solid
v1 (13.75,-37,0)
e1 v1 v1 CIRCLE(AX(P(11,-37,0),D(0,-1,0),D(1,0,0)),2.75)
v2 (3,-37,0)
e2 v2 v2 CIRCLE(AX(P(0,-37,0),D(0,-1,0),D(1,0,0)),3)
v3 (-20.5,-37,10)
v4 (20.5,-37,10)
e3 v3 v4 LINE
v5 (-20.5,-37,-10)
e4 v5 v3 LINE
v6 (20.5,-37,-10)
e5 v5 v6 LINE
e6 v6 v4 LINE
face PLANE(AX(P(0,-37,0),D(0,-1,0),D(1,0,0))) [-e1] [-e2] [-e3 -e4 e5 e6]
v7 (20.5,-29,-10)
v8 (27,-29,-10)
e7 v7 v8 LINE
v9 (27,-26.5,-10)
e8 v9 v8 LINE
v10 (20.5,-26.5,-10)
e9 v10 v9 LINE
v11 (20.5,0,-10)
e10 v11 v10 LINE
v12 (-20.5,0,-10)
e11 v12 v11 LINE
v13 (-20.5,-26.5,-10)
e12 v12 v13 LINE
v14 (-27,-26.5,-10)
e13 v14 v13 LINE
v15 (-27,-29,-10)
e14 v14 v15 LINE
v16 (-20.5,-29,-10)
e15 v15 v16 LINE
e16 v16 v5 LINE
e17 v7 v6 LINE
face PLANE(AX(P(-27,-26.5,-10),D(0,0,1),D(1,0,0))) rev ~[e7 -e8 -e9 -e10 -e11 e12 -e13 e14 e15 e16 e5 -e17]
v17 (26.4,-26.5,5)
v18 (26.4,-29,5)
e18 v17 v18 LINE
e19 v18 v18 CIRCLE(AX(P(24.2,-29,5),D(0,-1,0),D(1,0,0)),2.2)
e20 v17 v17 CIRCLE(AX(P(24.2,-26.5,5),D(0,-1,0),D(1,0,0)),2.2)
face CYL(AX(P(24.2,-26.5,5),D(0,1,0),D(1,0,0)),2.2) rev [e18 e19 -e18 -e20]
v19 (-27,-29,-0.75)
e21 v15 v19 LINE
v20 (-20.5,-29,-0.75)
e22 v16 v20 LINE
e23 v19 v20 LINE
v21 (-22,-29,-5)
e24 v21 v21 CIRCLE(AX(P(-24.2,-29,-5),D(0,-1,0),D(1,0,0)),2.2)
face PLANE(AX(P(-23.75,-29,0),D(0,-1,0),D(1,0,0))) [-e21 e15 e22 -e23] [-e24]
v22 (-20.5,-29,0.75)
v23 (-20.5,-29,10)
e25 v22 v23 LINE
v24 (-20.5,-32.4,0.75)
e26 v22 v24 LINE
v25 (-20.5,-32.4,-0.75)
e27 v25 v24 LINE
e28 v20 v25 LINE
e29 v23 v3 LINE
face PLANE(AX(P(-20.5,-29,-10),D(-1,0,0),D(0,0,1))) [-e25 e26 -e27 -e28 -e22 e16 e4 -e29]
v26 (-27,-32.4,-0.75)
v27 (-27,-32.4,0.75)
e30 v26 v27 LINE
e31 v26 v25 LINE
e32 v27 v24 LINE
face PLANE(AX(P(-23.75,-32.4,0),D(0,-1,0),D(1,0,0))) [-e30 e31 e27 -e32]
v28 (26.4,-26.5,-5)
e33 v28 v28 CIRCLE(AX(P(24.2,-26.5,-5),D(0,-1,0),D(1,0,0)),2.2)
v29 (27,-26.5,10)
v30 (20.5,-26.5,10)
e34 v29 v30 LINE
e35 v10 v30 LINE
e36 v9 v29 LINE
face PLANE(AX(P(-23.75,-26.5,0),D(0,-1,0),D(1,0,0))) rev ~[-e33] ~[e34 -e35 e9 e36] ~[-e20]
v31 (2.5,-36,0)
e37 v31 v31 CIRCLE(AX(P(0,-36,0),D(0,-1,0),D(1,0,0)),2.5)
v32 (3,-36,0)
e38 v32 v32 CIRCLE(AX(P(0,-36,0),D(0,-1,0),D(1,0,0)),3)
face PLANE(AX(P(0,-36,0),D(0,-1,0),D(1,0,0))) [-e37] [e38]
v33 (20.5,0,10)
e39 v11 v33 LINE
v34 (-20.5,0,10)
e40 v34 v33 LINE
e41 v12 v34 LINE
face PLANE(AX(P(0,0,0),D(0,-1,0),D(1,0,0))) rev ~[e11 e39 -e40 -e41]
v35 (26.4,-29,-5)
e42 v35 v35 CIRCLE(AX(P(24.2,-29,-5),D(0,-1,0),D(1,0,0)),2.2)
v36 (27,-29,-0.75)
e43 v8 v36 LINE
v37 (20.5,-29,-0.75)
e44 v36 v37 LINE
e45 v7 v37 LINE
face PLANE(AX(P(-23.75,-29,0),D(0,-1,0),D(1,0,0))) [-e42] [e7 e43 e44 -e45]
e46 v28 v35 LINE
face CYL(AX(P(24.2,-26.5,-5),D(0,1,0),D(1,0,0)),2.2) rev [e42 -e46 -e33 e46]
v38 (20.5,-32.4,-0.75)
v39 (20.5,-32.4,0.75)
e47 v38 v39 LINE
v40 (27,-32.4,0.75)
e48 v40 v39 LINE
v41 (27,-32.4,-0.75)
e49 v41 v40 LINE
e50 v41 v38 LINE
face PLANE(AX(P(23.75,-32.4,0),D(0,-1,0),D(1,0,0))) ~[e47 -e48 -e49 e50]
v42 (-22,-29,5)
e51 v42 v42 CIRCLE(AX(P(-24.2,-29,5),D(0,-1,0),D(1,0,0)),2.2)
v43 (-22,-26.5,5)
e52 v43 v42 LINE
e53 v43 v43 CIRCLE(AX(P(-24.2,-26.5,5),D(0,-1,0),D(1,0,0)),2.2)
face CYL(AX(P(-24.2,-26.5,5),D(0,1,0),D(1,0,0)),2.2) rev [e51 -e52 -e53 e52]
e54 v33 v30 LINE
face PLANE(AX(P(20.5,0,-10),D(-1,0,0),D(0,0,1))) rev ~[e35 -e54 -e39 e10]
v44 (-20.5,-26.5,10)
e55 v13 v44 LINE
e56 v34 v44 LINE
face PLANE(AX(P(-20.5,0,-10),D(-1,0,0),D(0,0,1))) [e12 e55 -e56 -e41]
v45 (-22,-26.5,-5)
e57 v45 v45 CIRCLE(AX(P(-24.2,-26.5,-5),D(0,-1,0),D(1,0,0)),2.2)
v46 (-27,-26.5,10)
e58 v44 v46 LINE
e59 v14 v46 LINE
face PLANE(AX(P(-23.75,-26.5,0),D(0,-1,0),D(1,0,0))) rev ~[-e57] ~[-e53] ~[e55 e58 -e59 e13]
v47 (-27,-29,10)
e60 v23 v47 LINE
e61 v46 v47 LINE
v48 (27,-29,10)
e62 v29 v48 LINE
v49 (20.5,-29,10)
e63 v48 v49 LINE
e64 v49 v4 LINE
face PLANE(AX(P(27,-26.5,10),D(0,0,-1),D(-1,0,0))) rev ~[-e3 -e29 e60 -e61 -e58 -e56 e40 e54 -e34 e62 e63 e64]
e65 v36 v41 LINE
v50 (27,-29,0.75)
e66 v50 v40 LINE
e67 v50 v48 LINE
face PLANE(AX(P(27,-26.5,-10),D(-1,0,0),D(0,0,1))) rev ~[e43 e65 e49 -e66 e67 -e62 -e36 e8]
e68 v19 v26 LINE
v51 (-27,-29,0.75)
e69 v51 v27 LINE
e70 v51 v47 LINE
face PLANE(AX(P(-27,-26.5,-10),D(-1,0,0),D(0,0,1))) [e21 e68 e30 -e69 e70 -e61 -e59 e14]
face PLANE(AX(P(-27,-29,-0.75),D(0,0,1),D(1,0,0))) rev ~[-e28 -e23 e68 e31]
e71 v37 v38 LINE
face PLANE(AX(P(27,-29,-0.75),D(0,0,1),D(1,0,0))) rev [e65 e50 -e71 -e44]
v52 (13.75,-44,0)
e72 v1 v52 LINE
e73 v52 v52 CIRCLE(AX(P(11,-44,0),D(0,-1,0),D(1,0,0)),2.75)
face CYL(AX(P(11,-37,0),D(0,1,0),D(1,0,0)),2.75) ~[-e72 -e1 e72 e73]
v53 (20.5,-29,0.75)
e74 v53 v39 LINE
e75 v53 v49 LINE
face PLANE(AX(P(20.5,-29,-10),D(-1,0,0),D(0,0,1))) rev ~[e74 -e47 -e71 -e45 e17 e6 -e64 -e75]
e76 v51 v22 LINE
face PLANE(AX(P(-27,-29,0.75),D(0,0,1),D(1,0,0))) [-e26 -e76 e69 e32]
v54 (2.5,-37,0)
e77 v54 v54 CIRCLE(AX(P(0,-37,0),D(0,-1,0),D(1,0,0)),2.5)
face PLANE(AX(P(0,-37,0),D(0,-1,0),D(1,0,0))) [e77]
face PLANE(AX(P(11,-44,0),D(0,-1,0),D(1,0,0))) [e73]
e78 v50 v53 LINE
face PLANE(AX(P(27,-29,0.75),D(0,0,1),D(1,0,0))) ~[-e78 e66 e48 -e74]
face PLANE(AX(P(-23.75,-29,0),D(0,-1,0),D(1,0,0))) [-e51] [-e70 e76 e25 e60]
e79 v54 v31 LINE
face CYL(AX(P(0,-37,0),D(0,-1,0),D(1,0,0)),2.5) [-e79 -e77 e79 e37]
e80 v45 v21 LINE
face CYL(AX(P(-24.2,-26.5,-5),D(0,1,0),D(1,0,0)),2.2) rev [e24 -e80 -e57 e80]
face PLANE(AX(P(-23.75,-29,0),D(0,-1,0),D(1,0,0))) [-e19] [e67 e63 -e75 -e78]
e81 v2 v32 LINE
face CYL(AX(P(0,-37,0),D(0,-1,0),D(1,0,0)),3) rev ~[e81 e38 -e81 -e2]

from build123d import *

# Parameters (mm, degrees)
F0_W      = 41
F0_H      = 20
F1_DEPTH  = 26.5
F2_W      = 6.5
F2_H      = 20
F2_R      = 2.2
F2_W_2    = 41
F3_DEPTH  = 2.5
F4_W      = 41
F4_H      = 20
F5_DEPTH  = 8
F6_W      = 6.5
F6_H      = 1.5
F7_DEPTH  = 3.4
F8_R      = 2.75
F9_DEPTH  = 7
F10_R     = 3
F10_R_2   = 2.5
F11_DEPTH = 1


# Not quite as in the source:
# - a pattern or mirror of a feature is missing from the dataset's text; its kind, count and spacing are read off the source's solid


with BuildPart() as f1:
    # F0 (on Front) → F1 (new body)
    with BuildSketch(Plane.XZ):
        Rectangle(F0_W, F0_H)
    extrude(amount=F1_DEPTH)

    # F2 (on face) → F3 (join)
    with BuildSketch(Plane.XZ.offset(26.5)):
        with Locations((-23.75, 0)):
            Rectangle(F2_W, F2_H)
        with Locations((-24.2, -5)):
            Circle(F2_R, mode=Mode.SUBTRACT)
        with Locations((-24.2, 5)):
            Circle(F2_R, mode=Mode.SUBTRACT)
        with Locations((23.75, 0)):
            Rectangle(F2_W, F2_H)
        with Locations((24.2, -5)):
            Circle(F2_R, mode=Mode.SUBTRACT)
        with Locations((24.2, 5)):
            Circle(F2_R, mode=Mode.SUBTRACT)
        Rectangle(F2_W_2, F2_H)
    extrude(amount=F3_DEPTH)

    # F4 (on face) → F5 (join)
    with BuildSketch(Plane.XZ.offset(29)):
        Rectangle(F4_W, F4_H)
    extrude(amount=F5_DEPTH)

    # F6 (on face) → F7 (join)
    with BuildSketch(Plane.XZ.offset(29)):
        with Locations((-23.75, 0)):
            Rectangle(F6_W, F6_H)
    f7 = extrude(amount=F7_DEPTH)

    # F7_copies: F7 across plane
    add(f7.mirror(Plane(origin=(0, 0, 0), x_dir=(0, 0, 1), z_dir=(1, 0, 0))))

    # F8 (on face) → F9 (join)
    with BuildSketch(Plane.XZ.offset(37)):
        with Locations((11, 0)):
            Circle(F8_R)
    extrude(amount=F9_DEPTH)

    # F10 (on face) → F11 (cut)
    with BuildSketch(Plane.XZ.offset(37)):
        Circle(F10_R)
        Circle(F10_R_2, mode=Mode.SUBTRACT)
    extrude(amount=-F11_DEPTH, mode=Mode.SUBTRACT)


solid = f1.part
